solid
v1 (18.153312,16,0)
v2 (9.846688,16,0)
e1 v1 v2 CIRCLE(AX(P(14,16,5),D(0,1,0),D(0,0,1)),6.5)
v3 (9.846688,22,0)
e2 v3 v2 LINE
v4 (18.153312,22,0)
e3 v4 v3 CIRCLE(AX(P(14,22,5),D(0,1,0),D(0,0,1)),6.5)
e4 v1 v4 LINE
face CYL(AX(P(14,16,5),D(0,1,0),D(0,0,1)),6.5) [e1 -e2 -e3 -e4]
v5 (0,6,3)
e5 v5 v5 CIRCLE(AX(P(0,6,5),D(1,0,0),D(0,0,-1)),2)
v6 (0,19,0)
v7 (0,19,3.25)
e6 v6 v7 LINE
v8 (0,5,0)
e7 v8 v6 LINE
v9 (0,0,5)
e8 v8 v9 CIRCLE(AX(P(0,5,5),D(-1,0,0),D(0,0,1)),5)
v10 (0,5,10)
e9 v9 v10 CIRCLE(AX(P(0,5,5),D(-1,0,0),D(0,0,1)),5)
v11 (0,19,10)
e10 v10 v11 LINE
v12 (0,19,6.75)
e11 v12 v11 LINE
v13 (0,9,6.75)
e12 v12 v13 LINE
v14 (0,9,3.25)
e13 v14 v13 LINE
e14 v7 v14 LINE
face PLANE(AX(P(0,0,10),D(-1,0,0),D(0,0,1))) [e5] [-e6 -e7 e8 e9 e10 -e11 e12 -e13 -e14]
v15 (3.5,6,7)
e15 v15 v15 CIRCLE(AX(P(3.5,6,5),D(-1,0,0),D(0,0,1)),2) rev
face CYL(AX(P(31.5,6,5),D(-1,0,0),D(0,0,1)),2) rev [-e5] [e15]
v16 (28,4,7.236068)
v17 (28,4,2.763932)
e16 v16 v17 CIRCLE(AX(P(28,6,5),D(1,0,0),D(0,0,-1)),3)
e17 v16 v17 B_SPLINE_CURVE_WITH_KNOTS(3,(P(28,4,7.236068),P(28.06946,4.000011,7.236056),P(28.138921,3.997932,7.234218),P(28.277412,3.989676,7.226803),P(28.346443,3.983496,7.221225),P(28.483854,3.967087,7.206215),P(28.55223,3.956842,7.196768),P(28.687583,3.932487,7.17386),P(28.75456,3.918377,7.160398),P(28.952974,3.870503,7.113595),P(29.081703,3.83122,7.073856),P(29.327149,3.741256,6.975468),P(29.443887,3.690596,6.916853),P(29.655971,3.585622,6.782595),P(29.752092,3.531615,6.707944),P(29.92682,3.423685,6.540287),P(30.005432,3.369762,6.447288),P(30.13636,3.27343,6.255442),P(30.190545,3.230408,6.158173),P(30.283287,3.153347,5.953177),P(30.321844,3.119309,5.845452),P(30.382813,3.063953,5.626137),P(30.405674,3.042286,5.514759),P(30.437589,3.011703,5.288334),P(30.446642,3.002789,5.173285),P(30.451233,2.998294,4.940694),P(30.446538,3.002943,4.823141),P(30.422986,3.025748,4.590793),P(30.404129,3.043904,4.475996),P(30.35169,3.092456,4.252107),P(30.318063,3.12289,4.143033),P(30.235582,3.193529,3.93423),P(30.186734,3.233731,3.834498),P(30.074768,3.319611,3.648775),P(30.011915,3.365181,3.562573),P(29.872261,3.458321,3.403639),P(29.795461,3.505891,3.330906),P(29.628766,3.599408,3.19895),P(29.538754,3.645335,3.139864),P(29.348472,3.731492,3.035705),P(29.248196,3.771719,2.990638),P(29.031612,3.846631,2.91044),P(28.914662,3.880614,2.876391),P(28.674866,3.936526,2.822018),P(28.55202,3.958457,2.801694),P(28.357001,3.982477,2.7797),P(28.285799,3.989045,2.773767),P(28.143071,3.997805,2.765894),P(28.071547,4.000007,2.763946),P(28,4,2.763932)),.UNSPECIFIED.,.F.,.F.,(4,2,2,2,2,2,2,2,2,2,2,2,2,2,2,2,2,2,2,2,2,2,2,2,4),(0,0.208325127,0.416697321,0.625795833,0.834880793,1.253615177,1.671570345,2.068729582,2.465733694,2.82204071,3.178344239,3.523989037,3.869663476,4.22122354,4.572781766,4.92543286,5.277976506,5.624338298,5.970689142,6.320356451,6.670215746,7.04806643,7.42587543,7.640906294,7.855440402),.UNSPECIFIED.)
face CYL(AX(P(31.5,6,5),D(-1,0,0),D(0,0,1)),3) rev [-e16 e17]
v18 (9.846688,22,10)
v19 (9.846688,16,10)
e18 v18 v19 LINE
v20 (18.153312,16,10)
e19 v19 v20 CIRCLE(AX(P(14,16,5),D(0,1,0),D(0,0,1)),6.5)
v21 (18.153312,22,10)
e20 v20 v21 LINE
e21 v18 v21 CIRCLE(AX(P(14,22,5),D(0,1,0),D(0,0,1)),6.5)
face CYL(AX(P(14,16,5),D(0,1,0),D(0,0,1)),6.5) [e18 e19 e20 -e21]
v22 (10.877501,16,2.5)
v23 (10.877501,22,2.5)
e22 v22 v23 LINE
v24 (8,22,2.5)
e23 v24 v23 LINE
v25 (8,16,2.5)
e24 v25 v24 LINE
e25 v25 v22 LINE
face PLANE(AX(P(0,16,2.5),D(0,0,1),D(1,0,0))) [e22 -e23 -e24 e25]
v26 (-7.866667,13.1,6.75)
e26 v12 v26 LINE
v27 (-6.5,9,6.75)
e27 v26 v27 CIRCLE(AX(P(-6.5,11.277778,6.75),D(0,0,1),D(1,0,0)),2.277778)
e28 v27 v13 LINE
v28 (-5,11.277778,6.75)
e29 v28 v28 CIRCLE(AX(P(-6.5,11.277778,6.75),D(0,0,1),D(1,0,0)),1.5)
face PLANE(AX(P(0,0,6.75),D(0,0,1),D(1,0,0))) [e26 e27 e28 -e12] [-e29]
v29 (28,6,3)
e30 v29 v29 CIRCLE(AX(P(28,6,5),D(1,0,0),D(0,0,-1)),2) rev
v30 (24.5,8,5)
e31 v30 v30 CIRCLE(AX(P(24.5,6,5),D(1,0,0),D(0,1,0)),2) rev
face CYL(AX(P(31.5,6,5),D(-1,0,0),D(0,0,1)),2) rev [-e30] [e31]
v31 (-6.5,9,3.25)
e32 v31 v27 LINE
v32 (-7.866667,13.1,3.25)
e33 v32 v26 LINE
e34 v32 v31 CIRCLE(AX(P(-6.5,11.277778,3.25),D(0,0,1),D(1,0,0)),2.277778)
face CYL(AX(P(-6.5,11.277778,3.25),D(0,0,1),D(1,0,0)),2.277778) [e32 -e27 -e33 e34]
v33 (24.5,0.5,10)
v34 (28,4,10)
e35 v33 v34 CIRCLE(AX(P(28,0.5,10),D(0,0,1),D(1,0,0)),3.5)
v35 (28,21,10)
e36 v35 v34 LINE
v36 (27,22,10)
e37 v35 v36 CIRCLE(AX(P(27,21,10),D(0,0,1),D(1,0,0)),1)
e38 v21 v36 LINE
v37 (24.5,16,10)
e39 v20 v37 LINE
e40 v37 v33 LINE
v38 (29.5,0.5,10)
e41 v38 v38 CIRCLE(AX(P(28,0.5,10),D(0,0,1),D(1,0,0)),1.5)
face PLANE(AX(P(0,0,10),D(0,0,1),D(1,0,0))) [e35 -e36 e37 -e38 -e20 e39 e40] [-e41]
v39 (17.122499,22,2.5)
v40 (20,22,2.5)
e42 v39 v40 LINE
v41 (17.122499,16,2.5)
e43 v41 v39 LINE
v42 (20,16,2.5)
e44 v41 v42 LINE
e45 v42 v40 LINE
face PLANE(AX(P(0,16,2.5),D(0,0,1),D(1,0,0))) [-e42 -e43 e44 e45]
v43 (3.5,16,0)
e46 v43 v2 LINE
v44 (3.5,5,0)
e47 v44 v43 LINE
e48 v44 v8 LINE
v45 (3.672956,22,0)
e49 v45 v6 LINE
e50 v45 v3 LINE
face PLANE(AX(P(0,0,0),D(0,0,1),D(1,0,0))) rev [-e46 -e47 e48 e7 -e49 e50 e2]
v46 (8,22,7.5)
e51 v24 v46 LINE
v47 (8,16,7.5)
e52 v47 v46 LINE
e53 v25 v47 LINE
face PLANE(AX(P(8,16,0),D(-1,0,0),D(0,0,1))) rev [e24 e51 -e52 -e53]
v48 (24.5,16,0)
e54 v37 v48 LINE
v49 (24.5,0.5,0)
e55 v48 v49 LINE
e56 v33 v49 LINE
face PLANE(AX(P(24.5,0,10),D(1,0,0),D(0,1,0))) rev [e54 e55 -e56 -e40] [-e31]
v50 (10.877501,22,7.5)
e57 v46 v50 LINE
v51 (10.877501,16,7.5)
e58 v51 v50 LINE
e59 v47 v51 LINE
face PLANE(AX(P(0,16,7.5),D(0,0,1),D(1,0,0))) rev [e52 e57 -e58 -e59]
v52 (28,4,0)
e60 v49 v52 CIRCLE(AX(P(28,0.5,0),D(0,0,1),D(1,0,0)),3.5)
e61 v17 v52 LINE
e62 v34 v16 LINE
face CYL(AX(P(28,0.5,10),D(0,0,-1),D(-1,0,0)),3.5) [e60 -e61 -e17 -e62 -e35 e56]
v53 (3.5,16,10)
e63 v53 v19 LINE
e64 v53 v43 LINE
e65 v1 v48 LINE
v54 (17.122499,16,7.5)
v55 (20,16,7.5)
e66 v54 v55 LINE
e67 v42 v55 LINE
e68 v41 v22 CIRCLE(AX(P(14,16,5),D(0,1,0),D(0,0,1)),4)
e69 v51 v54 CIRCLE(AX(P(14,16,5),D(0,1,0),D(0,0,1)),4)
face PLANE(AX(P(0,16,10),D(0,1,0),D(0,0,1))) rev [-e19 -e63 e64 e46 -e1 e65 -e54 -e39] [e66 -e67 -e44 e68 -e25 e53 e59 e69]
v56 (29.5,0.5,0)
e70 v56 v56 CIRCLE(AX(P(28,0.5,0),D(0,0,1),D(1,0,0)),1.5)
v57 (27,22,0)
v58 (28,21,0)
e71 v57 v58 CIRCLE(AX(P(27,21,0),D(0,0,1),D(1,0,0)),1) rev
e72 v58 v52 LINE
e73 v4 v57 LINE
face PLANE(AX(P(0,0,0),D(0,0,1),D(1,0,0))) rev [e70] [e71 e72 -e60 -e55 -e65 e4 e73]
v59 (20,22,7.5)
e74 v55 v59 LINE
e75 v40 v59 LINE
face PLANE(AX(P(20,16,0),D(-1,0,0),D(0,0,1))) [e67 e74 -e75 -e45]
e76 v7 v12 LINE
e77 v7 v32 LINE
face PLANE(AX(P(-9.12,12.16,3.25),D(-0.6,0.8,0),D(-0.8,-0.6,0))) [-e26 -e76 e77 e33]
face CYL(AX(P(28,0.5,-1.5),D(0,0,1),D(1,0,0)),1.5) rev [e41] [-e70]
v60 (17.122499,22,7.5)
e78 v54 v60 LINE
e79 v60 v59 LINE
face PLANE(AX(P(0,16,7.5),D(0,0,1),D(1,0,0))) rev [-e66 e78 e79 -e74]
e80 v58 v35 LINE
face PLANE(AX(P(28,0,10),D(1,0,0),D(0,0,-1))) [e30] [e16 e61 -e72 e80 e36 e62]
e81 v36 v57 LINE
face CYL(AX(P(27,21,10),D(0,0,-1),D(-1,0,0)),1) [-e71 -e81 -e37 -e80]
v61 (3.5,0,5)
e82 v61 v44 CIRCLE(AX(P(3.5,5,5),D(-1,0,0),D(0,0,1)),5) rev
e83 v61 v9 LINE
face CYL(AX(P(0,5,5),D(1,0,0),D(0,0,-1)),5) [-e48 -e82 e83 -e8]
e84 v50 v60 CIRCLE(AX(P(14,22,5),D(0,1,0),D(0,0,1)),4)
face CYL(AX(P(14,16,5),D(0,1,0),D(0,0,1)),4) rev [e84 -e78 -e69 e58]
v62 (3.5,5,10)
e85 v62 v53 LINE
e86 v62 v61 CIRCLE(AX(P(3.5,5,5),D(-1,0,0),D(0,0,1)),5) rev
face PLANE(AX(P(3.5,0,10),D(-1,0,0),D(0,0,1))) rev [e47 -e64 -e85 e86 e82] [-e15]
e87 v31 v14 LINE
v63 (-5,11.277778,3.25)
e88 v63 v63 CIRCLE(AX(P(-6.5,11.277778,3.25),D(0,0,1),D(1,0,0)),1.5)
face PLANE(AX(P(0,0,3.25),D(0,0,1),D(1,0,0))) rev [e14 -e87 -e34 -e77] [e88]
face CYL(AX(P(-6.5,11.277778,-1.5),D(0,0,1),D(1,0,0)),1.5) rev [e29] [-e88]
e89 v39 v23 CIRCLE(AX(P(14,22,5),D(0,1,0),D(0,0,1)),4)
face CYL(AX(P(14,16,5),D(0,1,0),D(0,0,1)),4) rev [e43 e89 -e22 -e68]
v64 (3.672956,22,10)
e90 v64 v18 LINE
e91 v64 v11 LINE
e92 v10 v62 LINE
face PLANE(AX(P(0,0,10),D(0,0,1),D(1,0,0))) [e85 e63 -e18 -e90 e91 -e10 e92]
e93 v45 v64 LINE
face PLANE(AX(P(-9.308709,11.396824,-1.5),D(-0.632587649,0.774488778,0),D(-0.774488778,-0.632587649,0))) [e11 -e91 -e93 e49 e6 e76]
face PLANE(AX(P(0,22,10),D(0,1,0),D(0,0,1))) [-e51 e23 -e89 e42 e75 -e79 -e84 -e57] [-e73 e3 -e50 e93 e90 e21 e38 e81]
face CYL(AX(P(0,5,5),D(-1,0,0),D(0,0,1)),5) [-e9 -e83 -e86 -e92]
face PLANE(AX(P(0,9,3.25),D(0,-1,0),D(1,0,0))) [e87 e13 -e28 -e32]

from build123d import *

# Parameters (mm, degrees)
SKETCH1_W                = 3.5
SKETCH1_H                = 16
SKETCH1_W_2              = 21
SKETCH1_H_2              = 6
BOSS_EXTRUDE1_DEPTH      = 10
SKETCH2_R                = 6.5
BOSS_EXTRUDE2_DEPTH      = 6
CUT_EXTRUDE2_DEPTH       = 6
SKETCH5_R                = 1.5
CUT_EXTRUDE3_DEPTH       = 41.10610926
BOSS_EXTRUDE3_DEPTH      = 1.75
BOSS_EXTRUDE3_DEPTH_BACK = 1.75
SKETCH6_R                = 2.277777778
CUT_EXTRUDE6_DEPTH       = 39.967935537
CUT_EXTRUDE6_DEPTH_BACK  = 39.967935537
FILLET1_R                = 1
FILLET2_R                = 5
SKETCH11_R               = 2
CUT_EXTRUDE7_DEPTH       = 41.10610926
SKETCH12_R               = 3
CUT_EXTRUDE8_DEPTH       = 45.371780878
CUT_EXTRUDE9_DEPTH       = 39.967935618
CUT_EXTRUDE9_DEPTH_BACK  = 39.967935618
SKETCH13_R               = 1.5


with BuildPart() as part:
    # Sketch1 → Boss-Extrude1 (new body)
    with BuildSketch(Plane.XY):
        with Locations((1.75, 8)):
            Rectangle(SKETCH1_W, SKETCH1_H)
        with Locations((14, 19)):
            Rectangle(SKETCH1_W_2, SKETCH1_H_2)
        with Locations((1.75, 19)):
            Rectangle(SKETCH1_W, SKETCH1_H_2)
        with Locations((26.25, 19)):
            Rectangle(SKETCH1_W, SKETCH1_H_2)
        with BuildLine():
            Line((28, 16), (24.5, 16))
            Line((24.5, 16), (24.5, 0.5))
            ThreePointArc((24.5, 0.5), (25.525126266, 2.974873734), (28, 4))
            Line((28, 4), (28, 16))
        make_face()
        with BuildLine():
            ThreePointArc((28, 4), (25.525126266, 2.974873734), (24.5, 0.5))
            ThreePointArc((24.5, 0.5), (25.525126266, -1.974873734), (28, -3))
            Line((28, -3), (28, 4))
        make_face()
        with BuildLine():
            ThreePointArc((31.5, 0.5), (30.474873734, 2.974873734), (28, 4))
            Line((28, 4), (28, -3))
            ThreePointArc((28, -3), (30.474873734, -1.974873734), (31.5, 0.5))
        make_face()
        with BuildLine():
            ThreePointArc((28, 4), (25.525126266, 2.974873734), (24.5, 0.5))
            ThreePointArc((24.5, 0.5), (25.525126266, -1.974873734), (28, -3))
            Line((28, -3), (28, 4))
        make_face()
        with BuildLine():
            ThreePointArc((31.5, 0.5), (30.474873734, 2.974873734), (28, 4))
            Line((28, 4), (28, -3))
            ThreePointArc((28, -3), (30.474873734, -1.974873734), (31.5, 0.5))
        make_face()
    extrude(amount=BOSS_EXTRUDE1_DEPTH)

    # Sketch2 → Boss-Extrude2 (add)
    with BuildSketch(Plane(origin=(0, 22, 0), x_dir=(1, 0, 0), z_dir=(0, 1, 0))):
        with Locations((14, -5)):
            Circle(SKETCH2_R)
    extrude(amount=-BOSS_EXTRUDE2_DEPTH)

    # Sketch4 → Cut-Extrude2 (cut)
    with BuildSketch(Plane(origin=(0, 22, 0), x_dir=(1, 0, 0), z_dir=(0, 1, 0))):
        with BuildLine():
            Line((17.122498999, -2.5), (10.877501001, -2.5))
            ThreePointArc((10.877501001, -2.5), (10, -5), (10.877501001, -7.5))
            Line((10.877501001, -7.5), (17.122498999, -7.5))
            ThreePointArc((17.122498999, -7.5), (17.774254628, -6.324764885), (18, -5))
            ThreePointArc((18, -5), (17.774254628, -3.675235115), (17.122498999, -2.5))
        make_face()
        with BuildLine():
            Line((20, -2.5), (17.122498999, -2.5))
            ThreePointArc((17.122498999, -2.5), (17.774254628, -3.675235115), (18, -5))
            ThreePointArc((18, -5), (17.774254628, -6.324764885), (17.122498999, -7.5))
            Line((17.122498999, -7.5), (20, -7.5))
            Line((20, -7.5), (20, -2.5))
        make_face()
        with BuildLine():
            Line((10.877501001, -2.5), (8, -2.5))
            Line((8, -2.5), (8, -7.5))
            Line((8, -7.5), (10.877501001, -7.5))
            ThreePointArc((10.877501001, -7.5), (10, -5), (10.877501001, -2.5))
        make_face()
        with BuildLine():
            ThreePointArc((17.122498999, -2.5), (14, -1), (10.877501001, -2.5))
            Line((10.877501001, -2.5), (17.122498999, -2.5))
        make_face()
        with BuildLine():
            Line((17.122498999, -7.5), (10.877501001, -7.5))
            ThreePointArc((10.877501001, -7.5), (14, -9), (17.122498999, -7.5))
        make_face()
    extrude(amount=-CUT_EXTRUDE2_DEPTH, mode=Mode.SUBTRACT)

    # Sketch5 → Cut-Extrude3 (cut, through all)
    with BuildSketch(Plane.XY.offset(10)):
        with Locations((28, 0.5)):
            Circle(SKETCH5_R)
    extrude(amount=-CUT_EXTRUDE3_DEPTH, mode=Mode.SUBTRACT)

    # Sketch6 → Boss-Extrude3 (add, two sides: drawn at the far end of the back side and taken through both)
    with BuildSketch(Plane.XY.offset(5).offset(-BOSS_EXTRUDE3_DEPTH_BACK)):
        with BuildLine():
            Line((0, 9), (0, 19))
            Line((0, 19), (-7.866666667, 13.1))
            ThreePointArc((-7.866666667, 13.1), (-5.48134681, 13.315084157), (-4.222222222, 11.277777778))
            ThreePointArc((-4.222222222, 11.277777778), (-4.889367887, 9.667145665), (-6.5, 9))
            Line((-6.5, 9), (0, 9))
        make_face()
        with Locations((-6.5, 11.277777778)):
            Circle(SKETCH6_R)
    extrude(amount=BOSS_EXTRUDE3_DEPTH + BOSS_EXTRUDE3_DEPTH_BACK)

    # Sketch10 → Cut-Extrude6 (cut, two sides: drawn at the far end of the back side and taken through both)
    with BuildSketch(Plane.XY.offset(5).offset(-CUT_EXTRUDE6_DEPTH_BACK)):
        Polygon((0, 22), (0, 19), (2.784123139, 21.274018631), (3.672955578, 22), align=None)
    extrude(amount=CUT_EXTRUDE6_DEPTH + CUT_EXTRUDE6_DEPTH_BACK, mode=Mode.SUBTRACT)

    # Fillet1
    fillet1_edges = [part.edges().sort_by_distance(p)[0] for p in [
        (28, 22, 5),
    ]]
    fillet(fillet1_edges, radius=FILLET1_R)

    # Fillet2
    fillet2_edges = [part.edges().sort_by_distance(p)[0] for p in [
        (1.75, 0, 0),
        (1.75, 0, 10),
    ]]
    fillet(fillet2_edges, radius=FILLET2_R - 0.0001)  # a hair under: the kernel refuses the full size

    # Sketch11 → Cut-Extrude7 (cut, through all)
    with BuildSketch(Plane(origin=(0, 0, 0), x_dir=(0, 0, -1), z_dir=(1, 0, 0))):
        with Locations(Location((-5, 6, 0), (0, 0, 270))):
            Circle(SKETCH11_R)
    extrude(amount=CUT_EXTRUDE7_DEPTH, mode=Mode.SUBTRACT)

    # Sketch12 → Cut-Extrude8 (cut, through all)
    with BuildSketch(Plane(origin=(28, 0, 0), x_dir=(0, 0, -1), z_dir=(1, 0, 0))):
        with Locations((-5, 6)):
            Circle(SKETCH12_R)
    extrude(amount=CUT_EXTRUDE8_DEPTH, mode=Mode.SUBTRACT)

    # Sketch13 → Cut-Extrude9 (cut, two sides: drawn at the far end of the back side and taken through both)
    with BuildSketch(Plane.XY.offset(5).offset(-CUT_EXTRUDE9_DEPTH_BACK)):
        with Locations((-6.5, 11.277777778)):
            Circle(SKETCH13_R)
    extrude(amount=CUT_EXTRUDE9_DEPTH + CUT_EXTRUDE9_DEPTH_BACK, mode=Mode.SUBTRACT)


solid = part.part
